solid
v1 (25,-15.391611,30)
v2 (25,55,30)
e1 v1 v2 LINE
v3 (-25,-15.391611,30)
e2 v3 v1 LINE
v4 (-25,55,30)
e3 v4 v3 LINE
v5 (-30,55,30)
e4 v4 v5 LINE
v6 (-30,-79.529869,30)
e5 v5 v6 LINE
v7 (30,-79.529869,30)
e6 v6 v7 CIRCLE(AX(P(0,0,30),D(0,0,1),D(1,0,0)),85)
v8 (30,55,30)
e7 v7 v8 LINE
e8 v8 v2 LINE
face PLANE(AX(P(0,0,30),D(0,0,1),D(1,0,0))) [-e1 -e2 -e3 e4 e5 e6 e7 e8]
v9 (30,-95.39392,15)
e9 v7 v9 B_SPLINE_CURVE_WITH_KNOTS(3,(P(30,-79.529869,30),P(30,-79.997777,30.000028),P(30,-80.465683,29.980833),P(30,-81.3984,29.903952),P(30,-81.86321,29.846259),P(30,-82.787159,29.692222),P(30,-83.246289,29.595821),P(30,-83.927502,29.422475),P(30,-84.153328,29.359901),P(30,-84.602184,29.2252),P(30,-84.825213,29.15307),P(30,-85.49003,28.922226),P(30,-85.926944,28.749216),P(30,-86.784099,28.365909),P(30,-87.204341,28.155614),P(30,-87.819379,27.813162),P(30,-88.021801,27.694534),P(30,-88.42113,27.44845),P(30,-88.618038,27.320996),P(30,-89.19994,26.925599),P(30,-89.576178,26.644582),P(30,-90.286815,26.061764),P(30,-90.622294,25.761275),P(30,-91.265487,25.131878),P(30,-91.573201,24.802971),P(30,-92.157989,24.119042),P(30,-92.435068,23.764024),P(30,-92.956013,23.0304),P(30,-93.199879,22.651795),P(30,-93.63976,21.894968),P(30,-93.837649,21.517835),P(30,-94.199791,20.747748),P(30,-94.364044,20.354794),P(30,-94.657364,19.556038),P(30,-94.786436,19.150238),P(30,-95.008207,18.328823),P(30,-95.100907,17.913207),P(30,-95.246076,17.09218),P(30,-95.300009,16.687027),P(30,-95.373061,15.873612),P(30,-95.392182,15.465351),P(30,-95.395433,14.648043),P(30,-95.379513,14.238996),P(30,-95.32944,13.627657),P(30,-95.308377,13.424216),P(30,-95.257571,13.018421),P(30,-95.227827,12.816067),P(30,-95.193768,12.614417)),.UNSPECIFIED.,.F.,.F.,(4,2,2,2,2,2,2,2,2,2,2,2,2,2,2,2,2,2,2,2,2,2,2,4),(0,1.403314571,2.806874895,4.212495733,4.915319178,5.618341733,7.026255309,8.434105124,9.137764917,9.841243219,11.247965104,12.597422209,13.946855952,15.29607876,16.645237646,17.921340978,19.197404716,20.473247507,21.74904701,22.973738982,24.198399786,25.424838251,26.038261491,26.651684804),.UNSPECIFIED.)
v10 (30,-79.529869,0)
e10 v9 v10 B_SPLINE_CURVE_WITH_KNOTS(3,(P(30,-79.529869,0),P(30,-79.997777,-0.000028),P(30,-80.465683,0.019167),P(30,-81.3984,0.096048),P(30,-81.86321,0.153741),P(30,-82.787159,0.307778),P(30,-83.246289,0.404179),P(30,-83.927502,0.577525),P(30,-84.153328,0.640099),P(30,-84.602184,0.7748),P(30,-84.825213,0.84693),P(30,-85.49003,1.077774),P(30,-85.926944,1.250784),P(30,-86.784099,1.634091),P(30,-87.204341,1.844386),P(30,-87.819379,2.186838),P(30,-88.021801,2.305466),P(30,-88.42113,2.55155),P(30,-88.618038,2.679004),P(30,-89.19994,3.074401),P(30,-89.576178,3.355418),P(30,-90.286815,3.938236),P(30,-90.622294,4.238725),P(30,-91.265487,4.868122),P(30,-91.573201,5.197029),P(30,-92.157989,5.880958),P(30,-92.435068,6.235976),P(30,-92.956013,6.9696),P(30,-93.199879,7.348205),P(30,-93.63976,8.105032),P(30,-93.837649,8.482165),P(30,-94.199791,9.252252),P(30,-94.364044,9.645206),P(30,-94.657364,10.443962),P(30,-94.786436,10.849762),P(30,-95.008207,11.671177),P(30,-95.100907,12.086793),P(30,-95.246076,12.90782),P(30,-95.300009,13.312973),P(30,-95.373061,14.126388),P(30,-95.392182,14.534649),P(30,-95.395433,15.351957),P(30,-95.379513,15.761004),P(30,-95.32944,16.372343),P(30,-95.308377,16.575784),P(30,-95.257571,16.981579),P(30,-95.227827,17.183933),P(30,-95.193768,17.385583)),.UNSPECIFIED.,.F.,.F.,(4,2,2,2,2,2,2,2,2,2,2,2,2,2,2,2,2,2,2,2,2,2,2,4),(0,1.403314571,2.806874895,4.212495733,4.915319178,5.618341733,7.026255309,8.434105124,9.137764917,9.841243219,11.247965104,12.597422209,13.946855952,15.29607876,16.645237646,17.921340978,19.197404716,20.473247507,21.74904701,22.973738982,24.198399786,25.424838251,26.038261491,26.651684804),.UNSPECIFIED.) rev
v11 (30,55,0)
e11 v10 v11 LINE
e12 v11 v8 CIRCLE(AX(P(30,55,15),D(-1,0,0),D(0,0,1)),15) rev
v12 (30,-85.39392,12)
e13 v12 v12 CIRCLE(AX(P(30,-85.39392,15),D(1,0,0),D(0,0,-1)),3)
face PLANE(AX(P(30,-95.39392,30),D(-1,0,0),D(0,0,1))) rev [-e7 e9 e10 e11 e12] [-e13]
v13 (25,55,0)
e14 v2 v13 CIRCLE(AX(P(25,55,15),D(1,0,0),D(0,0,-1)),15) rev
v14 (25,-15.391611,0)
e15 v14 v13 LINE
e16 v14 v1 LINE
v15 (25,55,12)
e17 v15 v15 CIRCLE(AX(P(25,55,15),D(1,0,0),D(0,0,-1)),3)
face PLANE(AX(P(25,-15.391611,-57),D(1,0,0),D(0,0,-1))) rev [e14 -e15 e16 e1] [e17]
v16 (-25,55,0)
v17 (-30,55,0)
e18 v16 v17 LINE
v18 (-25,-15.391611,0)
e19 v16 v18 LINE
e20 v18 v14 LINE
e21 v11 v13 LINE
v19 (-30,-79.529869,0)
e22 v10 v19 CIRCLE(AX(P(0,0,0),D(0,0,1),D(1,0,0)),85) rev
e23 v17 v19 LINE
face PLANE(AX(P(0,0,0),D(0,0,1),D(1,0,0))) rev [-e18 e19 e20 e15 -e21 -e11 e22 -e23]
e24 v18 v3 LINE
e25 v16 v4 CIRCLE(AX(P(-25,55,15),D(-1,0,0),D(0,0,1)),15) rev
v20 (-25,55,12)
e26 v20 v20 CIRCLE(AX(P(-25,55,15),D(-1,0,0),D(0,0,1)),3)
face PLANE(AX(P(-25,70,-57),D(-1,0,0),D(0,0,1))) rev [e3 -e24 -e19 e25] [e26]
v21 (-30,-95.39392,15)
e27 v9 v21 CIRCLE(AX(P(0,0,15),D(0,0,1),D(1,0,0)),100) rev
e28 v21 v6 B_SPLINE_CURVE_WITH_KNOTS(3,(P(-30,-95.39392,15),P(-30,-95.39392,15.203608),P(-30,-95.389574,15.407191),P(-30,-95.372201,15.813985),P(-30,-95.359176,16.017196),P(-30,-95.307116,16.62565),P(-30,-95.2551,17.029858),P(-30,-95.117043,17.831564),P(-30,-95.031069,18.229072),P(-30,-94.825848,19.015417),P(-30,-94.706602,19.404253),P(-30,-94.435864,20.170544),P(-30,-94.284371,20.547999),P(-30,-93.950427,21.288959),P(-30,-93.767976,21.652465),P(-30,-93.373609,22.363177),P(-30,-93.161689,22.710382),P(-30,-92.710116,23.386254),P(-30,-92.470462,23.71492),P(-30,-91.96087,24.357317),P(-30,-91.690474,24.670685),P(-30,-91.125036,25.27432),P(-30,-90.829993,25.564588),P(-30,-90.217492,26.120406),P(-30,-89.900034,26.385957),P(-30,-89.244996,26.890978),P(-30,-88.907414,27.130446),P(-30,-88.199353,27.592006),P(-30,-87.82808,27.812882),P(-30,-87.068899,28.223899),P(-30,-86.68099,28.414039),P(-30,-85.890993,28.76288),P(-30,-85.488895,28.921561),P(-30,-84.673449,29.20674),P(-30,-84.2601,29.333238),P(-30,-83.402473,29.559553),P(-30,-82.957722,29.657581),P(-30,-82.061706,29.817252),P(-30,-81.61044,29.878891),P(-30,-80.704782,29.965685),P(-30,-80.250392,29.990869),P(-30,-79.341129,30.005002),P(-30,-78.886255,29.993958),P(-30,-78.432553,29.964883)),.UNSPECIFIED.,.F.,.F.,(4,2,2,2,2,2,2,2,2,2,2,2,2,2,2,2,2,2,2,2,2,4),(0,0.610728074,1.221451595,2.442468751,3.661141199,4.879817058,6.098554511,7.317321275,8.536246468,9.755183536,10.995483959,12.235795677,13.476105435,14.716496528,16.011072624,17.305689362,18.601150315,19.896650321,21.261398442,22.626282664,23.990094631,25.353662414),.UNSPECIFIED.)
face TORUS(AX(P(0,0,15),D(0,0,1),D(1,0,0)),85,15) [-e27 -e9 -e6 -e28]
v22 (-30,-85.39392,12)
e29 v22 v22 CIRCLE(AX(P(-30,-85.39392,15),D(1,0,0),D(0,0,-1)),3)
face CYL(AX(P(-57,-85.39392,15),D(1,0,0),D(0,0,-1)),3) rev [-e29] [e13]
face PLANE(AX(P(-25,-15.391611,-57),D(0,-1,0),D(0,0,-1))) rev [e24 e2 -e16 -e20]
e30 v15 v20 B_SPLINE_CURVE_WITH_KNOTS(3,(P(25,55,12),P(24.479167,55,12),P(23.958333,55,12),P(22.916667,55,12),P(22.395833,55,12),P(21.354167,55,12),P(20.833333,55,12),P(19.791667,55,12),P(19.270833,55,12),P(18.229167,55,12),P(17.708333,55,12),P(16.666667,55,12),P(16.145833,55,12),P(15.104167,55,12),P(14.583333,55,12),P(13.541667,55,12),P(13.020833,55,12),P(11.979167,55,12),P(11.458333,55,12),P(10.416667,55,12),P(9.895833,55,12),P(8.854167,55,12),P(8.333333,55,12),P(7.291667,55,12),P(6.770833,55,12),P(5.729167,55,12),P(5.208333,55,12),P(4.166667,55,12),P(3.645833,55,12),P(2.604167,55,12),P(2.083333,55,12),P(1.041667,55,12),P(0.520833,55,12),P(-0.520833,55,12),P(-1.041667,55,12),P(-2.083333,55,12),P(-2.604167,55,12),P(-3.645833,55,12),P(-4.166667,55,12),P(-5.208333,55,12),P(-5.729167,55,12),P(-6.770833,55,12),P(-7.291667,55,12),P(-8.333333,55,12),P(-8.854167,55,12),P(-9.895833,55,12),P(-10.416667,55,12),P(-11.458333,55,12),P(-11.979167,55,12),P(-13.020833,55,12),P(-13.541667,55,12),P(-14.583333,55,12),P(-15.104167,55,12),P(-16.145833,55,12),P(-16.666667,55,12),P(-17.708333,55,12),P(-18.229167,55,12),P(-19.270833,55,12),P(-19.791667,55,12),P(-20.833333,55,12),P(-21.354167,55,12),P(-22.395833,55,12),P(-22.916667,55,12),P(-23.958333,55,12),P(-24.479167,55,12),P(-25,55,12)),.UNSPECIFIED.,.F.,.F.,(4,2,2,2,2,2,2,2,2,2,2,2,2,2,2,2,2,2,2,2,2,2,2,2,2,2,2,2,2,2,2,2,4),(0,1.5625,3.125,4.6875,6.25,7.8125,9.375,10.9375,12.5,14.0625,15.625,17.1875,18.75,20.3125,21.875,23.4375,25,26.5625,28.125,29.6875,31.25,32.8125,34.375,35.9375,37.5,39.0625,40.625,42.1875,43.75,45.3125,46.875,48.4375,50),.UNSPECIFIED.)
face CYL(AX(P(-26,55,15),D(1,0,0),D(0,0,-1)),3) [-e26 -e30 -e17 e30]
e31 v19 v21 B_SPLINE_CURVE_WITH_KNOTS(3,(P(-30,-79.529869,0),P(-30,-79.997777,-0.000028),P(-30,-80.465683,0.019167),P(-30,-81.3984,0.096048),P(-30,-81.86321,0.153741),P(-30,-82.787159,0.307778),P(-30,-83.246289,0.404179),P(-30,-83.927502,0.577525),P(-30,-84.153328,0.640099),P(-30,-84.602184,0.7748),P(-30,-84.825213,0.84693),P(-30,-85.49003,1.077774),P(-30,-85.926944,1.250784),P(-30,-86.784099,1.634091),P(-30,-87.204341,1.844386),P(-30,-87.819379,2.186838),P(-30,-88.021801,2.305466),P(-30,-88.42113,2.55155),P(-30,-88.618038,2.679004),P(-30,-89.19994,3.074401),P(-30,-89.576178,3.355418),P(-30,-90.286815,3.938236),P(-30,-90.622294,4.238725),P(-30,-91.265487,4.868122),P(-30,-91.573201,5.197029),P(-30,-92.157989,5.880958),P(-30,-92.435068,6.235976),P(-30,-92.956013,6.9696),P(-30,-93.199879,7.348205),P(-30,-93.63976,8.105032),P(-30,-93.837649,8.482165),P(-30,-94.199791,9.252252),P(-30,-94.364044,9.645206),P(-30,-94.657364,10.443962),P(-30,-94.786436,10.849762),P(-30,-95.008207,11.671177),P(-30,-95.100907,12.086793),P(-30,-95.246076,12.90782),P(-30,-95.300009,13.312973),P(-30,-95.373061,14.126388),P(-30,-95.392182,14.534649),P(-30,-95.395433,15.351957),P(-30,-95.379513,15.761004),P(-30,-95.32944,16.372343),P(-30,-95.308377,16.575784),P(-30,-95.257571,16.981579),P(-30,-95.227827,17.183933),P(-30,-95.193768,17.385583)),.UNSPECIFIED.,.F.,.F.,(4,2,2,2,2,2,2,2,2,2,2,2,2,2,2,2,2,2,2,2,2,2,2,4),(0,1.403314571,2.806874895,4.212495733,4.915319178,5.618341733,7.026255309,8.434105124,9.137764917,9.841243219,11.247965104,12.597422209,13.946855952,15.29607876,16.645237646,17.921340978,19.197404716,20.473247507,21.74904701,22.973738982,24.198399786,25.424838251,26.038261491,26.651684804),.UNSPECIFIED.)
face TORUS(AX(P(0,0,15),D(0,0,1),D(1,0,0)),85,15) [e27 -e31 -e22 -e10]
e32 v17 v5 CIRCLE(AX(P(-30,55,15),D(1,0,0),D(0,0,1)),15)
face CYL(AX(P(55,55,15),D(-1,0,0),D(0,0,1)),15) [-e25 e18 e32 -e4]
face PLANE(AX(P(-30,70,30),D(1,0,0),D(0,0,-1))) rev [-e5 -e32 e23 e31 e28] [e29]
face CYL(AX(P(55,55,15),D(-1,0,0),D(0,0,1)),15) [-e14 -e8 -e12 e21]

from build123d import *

# Parameters (mm, degrees)
EXTRUDE_1_DEPTH     = 30
SKETCH_2_R          = 3
CUT_EXTRUDE_1_DEPTH = 87
SKETCH_3_W          = 50
SKETCH_3_H          = 85.391611022
CUT_EXTRUDE_2_DEPTH = 87
SKETCH_4_R          = 3
EXTRUDE_2_DEPTH     = 56
FILLET_1_R          = 15
FILLET_2_R          = 15
CUT_EXTRUDE_3_DEPTH = 85


with BuildPart() as part:
    # 草图1 → 凸台-拉伸1 (new body)
    with BuildSketch(Plane.XY):
        with BuildLine():
            Line((30, -95.393920142), (30, 70))
            Line((30, 70), (-30, 70))
            Line((-30, 70), (-30, -95.393920142))
            ThreePointArc((-30, -95.393920142), (0, -100), (30, -95.393920142))
        make_face()
    extrude(amount=EXTRUDE_1_DEPTH)

    # 草图2 → 切除-拉伸1 (cut)
    with BuildSketch(Plane(origin=(30, 0, 0), x_dir=(0, 0, -1), z_dir=(1, 0, 0))):
        with Locations((-15, -85.393920142)):
            Circle(SKETCH_2_R)
    extrude(amount=-CUT_EXTRUDE_1_DEPTH, mode=Mode.SUBTRACT)

    # 草图3 → 切除-拉伸2 (cut)
    with BuildSketch(Plane.XY.offset(30)):
        with Locations((0, 27.304194489)):
            Rectangle(SKETCH_3_W, SKETCH_3_H)
    extrude(amount=-CUT_EXTRUDE_2_DEPTH, mode=Mode.SUBTRACT)

    # 草图4 → 凸台-拉伸2 (add)
    with BuildSketch(Plane(origin=(30, 0, 0), x_dir=(0, 0, -1), z_dir=(1, 0, 0))):
        with Locations((-15, 55)):
            Circle(SKETCH_4_R)
    extrude(amount=-EXTRUDE_2_DEPTH)

    # 圆角1
    fillet_1_edges = [part.edges().sort_by_distance(p)[0] for p in [
        (0, -100, 30),
    ]]
    fillet(fillet_1_edges, radius=FILLET_1_R)

    # 圆角2
    fillet_2_edges = [part.edges().sort_by_distance(p)[0] for p in [
        (0, -100, 0),
    ]]
    fillet(fillet_2_edges, radius=FILLET_2_R - 0.0001)  # a hair under: the kernel refuses the full size

    # 草图5 → 切除-拉伸3 (cut)
    with BuildSketch(Plane.ZY.offset(30)):
        with BuildLine():
            Line((30, 55), (48.391224998, 55))
            Line((48.391224998, 55), (48.391224998, 76.557809972))
            Line((48.391224998, 76.557809972), (-10.714250248, 76.557809972))
            Line((-10.714250248, 76.557809972), (-10.714250248, 55))
            Line((-10.714250248, 55), (0, 55))
            ThreePointArc((0, 55), (15, 70), (30, 55))
        make_face()
    extrude(amount=-CUT_EXTRUDE_3_DEPTH, mode=Mode.SUBTRACT)


solid = part.part
